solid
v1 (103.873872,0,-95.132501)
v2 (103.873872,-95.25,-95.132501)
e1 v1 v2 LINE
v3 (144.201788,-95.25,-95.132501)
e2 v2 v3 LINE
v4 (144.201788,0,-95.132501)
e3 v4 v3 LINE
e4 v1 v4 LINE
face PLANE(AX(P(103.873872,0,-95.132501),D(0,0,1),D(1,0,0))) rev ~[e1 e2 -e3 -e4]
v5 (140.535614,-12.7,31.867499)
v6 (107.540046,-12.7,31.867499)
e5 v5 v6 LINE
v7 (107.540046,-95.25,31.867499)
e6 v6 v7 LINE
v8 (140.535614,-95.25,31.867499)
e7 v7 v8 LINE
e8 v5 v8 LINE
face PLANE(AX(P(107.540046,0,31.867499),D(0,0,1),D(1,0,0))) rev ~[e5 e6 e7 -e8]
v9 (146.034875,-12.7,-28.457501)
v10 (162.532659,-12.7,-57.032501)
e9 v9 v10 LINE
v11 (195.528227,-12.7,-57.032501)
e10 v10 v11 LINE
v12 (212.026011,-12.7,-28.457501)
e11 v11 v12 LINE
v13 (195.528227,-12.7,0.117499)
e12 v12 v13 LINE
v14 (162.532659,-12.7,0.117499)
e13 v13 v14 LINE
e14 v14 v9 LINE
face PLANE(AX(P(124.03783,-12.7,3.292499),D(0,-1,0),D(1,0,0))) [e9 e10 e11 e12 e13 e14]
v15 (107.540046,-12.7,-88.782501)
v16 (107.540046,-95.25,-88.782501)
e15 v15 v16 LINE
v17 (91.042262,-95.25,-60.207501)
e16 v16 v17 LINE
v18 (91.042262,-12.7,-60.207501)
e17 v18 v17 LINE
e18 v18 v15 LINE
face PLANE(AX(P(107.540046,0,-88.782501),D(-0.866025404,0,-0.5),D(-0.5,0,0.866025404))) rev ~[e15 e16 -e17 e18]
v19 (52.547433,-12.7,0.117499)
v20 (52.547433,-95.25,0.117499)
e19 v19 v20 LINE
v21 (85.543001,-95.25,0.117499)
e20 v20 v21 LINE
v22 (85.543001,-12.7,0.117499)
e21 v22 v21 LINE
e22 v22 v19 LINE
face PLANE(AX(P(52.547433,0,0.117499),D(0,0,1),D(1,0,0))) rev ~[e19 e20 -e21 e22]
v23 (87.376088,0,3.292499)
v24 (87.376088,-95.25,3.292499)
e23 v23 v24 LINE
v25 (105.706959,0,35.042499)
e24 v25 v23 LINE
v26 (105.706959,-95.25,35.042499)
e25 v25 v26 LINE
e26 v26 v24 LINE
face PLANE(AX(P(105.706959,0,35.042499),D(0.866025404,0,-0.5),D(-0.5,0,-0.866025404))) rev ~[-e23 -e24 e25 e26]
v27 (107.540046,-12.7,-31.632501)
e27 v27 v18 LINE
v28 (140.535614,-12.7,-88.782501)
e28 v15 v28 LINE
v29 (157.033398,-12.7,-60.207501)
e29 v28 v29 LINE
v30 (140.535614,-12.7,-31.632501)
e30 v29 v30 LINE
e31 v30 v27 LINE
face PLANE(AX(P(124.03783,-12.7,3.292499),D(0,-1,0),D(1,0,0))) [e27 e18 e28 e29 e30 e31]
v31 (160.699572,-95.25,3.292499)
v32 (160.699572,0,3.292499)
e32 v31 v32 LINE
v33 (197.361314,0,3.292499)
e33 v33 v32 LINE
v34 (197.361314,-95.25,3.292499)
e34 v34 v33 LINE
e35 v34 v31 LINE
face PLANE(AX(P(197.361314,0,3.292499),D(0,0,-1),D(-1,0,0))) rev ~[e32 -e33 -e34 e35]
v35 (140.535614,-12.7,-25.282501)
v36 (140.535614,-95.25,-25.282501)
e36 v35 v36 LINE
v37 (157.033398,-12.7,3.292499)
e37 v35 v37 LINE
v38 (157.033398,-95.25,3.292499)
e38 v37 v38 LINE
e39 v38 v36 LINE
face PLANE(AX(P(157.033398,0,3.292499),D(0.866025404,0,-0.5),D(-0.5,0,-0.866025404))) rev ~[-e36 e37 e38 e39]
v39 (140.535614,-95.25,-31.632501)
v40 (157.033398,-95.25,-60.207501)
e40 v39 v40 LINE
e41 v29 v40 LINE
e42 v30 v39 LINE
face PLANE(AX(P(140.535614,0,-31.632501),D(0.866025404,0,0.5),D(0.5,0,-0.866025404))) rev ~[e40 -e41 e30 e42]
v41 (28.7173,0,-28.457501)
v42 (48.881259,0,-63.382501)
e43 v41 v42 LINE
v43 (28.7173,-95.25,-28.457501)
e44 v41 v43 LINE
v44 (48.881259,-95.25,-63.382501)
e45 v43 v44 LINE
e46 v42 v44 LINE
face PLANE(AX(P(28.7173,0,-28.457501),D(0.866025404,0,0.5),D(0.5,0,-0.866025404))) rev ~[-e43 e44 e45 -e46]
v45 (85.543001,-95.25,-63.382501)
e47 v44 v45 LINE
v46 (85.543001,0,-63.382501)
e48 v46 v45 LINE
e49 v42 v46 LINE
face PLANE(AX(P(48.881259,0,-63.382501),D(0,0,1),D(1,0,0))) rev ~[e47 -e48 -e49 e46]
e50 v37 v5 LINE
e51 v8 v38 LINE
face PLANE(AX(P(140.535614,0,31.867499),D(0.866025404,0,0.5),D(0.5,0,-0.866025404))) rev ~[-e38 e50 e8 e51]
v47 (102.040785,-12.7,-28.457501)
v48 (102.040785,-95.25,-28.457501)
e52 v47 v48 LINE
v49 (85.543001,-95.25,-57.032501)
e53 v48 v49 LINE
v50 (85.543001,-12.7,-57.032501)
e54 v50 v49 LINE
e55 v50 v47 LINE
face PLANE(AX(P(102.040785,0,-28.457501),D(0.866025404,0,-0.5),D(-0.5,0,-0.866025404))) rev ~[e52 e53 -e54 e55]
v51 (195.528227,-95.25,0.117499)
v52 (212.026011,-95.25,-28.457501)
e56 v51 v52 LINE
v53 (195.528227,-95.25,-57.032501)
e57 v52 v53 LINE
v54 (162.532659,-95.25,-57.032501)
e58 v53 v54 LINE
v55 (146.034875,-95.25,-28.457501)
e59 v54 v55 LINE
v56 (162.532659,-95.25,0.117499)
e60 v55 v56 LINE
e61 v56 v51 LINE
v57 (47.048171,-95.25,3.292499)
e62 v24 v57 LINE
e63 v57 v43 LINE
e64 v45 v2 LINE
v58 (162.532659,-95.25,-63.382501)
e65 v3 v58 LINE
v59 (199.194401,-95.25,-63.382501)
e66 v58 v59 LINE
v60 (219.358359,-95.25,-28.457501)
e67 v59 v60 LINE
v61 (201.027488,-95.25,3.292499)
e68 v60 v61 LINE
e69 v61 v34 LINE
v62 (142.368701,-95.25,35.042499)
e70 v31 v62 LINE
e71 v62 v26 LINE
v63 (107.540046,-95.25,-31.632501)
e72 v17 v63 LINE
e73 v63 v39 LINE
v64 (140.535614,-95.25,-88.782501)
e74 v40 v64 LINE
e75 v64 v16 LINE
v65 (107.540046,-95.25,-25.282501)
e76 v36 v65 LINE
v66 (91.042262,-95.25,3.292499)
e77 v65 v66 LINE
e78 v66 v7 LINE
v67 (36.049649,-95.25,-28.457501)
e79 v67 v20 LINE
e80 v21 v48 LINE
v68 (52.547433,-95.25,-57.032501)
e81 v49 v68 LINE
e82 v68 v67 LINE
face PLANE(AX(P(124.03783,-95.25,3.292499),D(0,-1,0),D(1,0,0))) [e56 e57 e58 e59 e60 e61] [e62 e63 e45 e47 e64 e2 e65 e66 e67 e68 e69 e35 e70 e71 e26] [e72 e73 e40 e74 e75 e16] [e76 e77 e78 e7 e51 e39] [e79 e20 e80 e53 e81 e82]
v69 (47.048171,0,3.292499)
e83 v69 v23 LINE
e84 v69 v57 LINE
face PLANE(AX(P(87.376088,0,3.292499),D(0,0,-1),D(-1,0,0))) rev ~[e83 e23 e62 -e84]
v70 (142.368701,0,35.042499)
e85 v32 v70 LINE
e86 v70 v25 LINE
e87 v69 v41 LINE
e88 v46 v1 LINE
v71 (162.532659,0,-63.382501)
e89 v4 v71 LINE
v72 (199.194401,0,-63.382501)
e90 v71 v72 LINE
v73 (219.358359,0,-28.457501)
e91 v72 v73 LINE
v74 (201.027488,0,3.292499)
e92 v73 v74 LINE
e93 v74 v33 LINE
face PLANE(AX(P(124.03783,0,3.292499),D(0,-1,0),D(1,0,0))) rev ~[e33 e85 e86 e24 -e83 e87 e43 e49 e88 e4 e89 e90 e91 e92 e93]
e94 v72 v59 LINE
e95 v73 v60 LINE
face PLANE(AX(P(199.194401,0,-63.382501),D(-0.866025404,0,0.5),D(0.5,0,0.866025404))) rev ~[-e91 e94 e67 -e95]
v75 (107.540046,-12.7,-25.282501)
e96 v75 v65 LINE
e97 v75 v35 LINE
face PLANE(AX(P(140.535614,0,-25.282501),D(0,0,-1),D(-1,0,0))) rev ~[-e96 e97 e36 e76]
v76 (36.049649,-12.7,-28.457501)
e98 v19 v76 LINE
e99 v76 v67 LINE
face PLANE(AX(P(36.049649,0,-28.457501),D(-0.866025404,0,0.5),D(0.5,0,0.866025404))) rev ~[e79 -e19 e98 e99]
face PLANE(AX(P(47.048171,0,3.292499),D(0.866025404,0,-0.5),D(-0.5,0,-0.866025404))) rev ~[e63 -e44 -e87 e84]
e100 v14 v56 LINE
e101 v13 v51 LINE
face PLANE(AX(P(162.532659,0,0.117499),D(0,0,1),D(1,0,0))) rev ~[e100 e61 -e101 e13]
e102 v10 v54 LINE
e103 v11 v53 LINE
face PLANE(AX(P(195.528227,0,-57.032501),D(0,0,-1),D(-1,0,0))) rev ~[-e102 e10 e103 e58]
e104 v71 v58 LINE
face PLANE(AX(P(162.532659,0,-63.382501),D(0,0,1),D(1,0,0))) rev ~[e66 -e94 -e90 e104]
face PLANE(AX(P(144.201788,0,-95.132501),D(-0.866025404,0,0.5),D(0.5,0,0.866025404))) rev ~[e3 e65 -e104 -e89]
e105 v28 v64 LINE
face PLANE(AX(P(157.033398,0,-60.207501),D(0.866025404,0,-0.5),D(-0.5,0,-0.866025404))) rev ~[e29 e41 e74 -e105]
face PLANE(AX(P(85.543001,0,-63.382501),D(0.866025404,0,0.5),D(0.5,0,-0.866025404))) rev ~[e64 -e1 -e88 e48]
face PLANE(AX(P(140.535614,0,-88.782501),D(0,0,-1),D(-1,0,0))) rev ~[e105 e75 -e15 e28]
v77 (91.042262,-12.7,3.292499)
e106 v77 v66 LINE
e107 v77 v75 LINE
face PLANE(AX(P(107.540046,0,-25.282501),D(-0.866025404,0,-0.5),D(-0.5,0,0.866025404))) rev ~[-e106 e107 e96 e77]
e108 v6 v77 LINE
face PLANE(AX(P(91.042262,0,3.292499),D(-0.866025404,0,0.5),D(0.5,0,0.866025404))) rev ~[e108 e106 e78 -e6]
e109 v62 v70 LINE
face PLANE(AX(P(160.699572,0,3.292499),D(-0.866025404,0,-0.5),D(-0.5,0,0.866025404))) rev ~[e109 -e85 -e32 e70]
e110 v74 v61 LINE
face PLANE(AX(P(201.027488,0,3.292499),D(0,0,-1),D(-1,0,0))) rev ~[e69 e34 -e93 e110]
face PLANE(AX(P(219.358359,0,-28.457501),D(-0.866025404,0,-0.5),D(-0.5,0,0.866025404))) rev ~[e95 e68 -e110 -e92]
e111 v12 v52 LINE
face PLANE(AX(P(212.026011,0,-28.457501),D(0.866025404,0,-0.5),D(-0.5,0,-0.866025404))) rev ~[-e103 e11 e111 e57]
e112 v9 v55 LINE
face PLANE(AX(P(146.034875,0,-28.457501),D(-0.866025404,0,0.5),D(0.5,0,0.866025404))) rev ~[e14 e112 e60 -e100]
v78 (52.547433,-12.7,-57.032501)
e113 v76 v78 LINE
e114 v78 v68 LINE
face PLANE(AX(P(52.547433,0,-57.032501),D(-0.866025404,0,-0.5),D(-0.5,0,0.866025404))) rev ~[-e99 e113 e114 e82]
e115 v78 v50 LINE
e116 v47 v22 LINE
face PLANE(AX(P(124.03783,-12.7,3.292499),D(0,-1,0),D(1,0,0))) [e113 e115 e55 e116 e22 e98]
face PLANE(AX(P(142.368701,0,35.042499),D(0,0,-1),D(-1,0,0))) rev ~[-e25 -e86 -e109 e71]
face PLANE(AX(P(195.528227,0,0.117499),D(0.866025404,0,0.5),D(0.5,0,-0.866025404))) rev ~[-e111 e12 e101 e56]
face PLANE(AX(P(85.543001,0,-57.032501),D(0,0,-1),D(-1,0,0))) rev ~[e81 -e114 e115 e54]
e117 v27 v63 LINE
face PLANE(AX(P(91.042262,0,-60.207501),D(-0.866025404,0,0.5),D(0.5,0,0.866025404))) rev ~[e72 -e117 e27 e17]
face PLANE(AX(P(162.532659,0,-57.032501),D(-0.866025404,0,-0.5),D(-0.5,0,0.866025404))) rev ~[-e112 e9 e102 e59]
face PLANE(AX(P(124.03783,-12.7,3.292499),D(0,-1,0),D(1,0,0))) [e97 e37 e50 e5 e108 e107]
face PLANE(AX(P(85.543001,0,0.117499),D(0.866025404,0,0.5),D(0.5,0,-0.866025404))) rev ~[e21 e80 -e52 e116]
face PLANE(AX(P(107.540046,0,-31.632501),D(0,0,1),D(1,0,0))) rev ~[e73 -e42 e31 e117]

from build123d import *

# Parameters (mm, degrees)
F1_DEPTH = 12.7
F2_DEPTH = 95.25


# Not quite as in the source:
# - a feature names something its author has since deleted; it is built from what else it names


with BuildPart() as f1:
    # F0 (on Front) → F1 (new body)
    with BuildSketch(Plane.XZ):
        Polygon((142.3687008922, 35.0424993012), (105.7069587986, 35.0424993011), (87.3760877519, 3.2924993012), (105.7069587986, -28.4575006988), (142.3687008922, -28.4575006988), (160.6995719389, 3.2924993012), align=None)
        Polygon((107.5400459033, -25.2825006989), (91.0422619612, 3.2924993011), (107.5400459033, 31.8674993011), (140.5356137875, 31.8674993012), (157.0333977296, 3.2924993012), (140.5356137875, -25.2825006988), align=None, mode=Mode.SUBTRACT)
        Polygon((105.7069587986, -28.4575006988), (87.3760877519, 3.2924993012), (50.7143456583, 3.2924993012), (32.3834746115, -28.4575006988), (50.7143456583, -60.2075006988), (87.3760877519, -60.2075006988), align=None)
        Polygon((52.547432763, -57.0325006988), (36.0496488209, -28.4575006988), (52.547432763, 0.1174993012), (85.5430006472, 0.1174993012), (102.0407845893, -28.4575006988), (85.5430006472, -57.0325006988), align=None, mode=Mode.SUBTRACT)
        Polygon((197.3613140325, 3.2924993012), (160.6995719389, 3.2924993012), (142.3687008922, -28.4575006988), (160.6995719389, -60.2075006988), (197.3613140325, -60.2075006988), (215.6921850793, -28.4575006988), align=None)
        Polygon((162.5326590436, -57.0325006988), (146.0348751015, -28.4575006988), (162.5326590436, 0.1174993012), (195.5282269278, 0.1174993012), (212.0260108699, -28.4575006988), (195.5282269278, -57.0325006988), align=None, mode=Mode.SUBTRACT)
        Polygon((142.3687008922, -28.4575006988), (105.7069587986, -28.4575006989), (87.3760877519, -60.2075006988), (105.7069587986, -91.9575006988), (142.3687008922, -91.9575006988), (160.6995719389, -60.2075006988), align=None)
        Polygon((107.5400459033, -88.7825006988), (91.0422619612, -60.2075006988), (107.5400459033, -31.6325006988), (140.5356137875, -31.6325006988), (157.0333977296, -60.2075006988), (140.5356137875, -88.7825006988), align=None, mode=Mode.SUBTRACT)
        Polygon((162.5326590436, 0.1174993012), (146.0348751015, -28.4575006988), (162.5326590436, -57.0325006988), (195.5282269278, -57.0325006988), (212.0260108699, -28.4575006988), (195.5282269278, 0.1174993012), align=None)
        Polygon((52.547432763, 0.1174993012), (36.0496488209, -28.4575006988), (52.547432763, -57.0325006988), (85.5430006472, -57.0325006988), (102.0407845893, -28.4575006988), (85.5430006472, 0.1174993012), align=None)
        Polygon((107.5400459033, 31.8674993011), (91.0422619612, 3.2924993011), (107.5400459033, -25.2825006989), (140.5356137875, -25.2825006988), (157.0333977296, 3.2924993012), (140.5356137875, 31.8674993012), align=None)
        Polygon((107.5400459033, -31.6325006988), (91.0422619612, -60.2075006988), (107.5400459033, -88.7825006988), (140.5356137875, -88.7825006988), (157.0333977296, -60.2075006988), (140.5356137875, -31.6325006988), align=None)
    extrude(amount=F1_DEPTH)

    # F0 (on Front) → F2 (join)
    with BuildSketch(Plane.XZ):
        Polygon((142.3687008922, 35.0424993012), (105.7069587986, 35.0424993011), (87.3760877519, 3.2924993012), (105.7069587986, -28.4575006988), (142.3687008922, -28.4575006988), (160.6995719389, 3.2924993012), align=None)
        Polygon((107.5400459033, -25.2825006989), (91.0422619612, 3.2924993011), (107.5400459033, 31.8674993011), (140.5356137875, 31.8674993012), (157.0333977296, 3.2924993012), (140.5356137875, -25.2825006988), align=None, mode=Mode.SUBTRACT)
        Polygon((197.3613140325, 3.2924993012), (160.6995719389, 3.2924993012), (142.3687008922, -28.4575006988), (160.6995719389, -60.2075006988), (197.3613140325, -60.2075006988), (215.6921850793, -28.4575006988), align=None)
        Polygon((162.5326590436, -57.0325006988), (146.0348751015, -28.4575006988), (162.5326590436, 0.1174993012), (195.5282269278, 0.1174993012), (212.0260108699, -28.4575006988), (195.5282269278, -57.0325006988), align=None, mode=Mode.SUBTRACT)
        Polygon((142.3687008922, -28.4575006988), (105.7069587986, -28.4575006989), (87.3760877519, -60.2075006988), (105.7069587986, -91.9575006988), (142.3687008922, -91.9575006988), (160.6995719389, -60.2075006988), align=None)
        Polygon((107.5400459033, -88.7825006988), (91.0422619612, -60.2075006988), (107.5400459033, -31.6325006988), (140.5356137875, -31.6325006988), (157.0333977296, -60.2075006988), (140.5356137875, -88.7825006988), align=None, mode=Mode.SUBTRACT)
        Polygon((105.7069587986, -28.4575006988), (87.3760877519, 3.2924993012), (50.7143456583, 3.2924993012), (32.3834746115, -28.4575006988), (50.7143456583, -60.2075006988), (87.3760877519, -60.2075006988), align=None)
        Polygon((52.547432763, -57.0325006988), (36.0496488209, -28.4575006988), (52.547432763, 0.1174993012), (85.5430006472, 0.1174993012), (102.0407845893, -28.4575006988), (85.5430006472, -57.0325006988), align=None, mode=Mode.SUBTRACT)
        Polygon((32.3834746115, -28.4575006988), (50.7143456583, 3.2924993012), (47.048171449, 3.2924993012), (28.7173004022, -28.4575006988), (48.8812585536, -63.3825006988), (85.5430006472, -63.3825006988), (103.873871694, -95.1325006988), (144.2017879969, -95.1325006988), (162.5326590436, -63.3825006988), (199.1944011372, -63.3825006988), (219.3583592886, -28.4575006988), (201.0274882418, 3.2924993011), (197.3613140325, 3.2924993012), (215.6921850793, -28.4575006988), (197.3613140325, -60.2075006988), (160.6995719389, -60.2075006988), (142.3687008922, -91.9575006988), (105.7069587986, -91.9575006988), (87.3760877519, -60.2075006988), (50.7143456583, -60.2075006988), align=None)
    extrude(amount=F2_DEPTH)


solid = f1.part
